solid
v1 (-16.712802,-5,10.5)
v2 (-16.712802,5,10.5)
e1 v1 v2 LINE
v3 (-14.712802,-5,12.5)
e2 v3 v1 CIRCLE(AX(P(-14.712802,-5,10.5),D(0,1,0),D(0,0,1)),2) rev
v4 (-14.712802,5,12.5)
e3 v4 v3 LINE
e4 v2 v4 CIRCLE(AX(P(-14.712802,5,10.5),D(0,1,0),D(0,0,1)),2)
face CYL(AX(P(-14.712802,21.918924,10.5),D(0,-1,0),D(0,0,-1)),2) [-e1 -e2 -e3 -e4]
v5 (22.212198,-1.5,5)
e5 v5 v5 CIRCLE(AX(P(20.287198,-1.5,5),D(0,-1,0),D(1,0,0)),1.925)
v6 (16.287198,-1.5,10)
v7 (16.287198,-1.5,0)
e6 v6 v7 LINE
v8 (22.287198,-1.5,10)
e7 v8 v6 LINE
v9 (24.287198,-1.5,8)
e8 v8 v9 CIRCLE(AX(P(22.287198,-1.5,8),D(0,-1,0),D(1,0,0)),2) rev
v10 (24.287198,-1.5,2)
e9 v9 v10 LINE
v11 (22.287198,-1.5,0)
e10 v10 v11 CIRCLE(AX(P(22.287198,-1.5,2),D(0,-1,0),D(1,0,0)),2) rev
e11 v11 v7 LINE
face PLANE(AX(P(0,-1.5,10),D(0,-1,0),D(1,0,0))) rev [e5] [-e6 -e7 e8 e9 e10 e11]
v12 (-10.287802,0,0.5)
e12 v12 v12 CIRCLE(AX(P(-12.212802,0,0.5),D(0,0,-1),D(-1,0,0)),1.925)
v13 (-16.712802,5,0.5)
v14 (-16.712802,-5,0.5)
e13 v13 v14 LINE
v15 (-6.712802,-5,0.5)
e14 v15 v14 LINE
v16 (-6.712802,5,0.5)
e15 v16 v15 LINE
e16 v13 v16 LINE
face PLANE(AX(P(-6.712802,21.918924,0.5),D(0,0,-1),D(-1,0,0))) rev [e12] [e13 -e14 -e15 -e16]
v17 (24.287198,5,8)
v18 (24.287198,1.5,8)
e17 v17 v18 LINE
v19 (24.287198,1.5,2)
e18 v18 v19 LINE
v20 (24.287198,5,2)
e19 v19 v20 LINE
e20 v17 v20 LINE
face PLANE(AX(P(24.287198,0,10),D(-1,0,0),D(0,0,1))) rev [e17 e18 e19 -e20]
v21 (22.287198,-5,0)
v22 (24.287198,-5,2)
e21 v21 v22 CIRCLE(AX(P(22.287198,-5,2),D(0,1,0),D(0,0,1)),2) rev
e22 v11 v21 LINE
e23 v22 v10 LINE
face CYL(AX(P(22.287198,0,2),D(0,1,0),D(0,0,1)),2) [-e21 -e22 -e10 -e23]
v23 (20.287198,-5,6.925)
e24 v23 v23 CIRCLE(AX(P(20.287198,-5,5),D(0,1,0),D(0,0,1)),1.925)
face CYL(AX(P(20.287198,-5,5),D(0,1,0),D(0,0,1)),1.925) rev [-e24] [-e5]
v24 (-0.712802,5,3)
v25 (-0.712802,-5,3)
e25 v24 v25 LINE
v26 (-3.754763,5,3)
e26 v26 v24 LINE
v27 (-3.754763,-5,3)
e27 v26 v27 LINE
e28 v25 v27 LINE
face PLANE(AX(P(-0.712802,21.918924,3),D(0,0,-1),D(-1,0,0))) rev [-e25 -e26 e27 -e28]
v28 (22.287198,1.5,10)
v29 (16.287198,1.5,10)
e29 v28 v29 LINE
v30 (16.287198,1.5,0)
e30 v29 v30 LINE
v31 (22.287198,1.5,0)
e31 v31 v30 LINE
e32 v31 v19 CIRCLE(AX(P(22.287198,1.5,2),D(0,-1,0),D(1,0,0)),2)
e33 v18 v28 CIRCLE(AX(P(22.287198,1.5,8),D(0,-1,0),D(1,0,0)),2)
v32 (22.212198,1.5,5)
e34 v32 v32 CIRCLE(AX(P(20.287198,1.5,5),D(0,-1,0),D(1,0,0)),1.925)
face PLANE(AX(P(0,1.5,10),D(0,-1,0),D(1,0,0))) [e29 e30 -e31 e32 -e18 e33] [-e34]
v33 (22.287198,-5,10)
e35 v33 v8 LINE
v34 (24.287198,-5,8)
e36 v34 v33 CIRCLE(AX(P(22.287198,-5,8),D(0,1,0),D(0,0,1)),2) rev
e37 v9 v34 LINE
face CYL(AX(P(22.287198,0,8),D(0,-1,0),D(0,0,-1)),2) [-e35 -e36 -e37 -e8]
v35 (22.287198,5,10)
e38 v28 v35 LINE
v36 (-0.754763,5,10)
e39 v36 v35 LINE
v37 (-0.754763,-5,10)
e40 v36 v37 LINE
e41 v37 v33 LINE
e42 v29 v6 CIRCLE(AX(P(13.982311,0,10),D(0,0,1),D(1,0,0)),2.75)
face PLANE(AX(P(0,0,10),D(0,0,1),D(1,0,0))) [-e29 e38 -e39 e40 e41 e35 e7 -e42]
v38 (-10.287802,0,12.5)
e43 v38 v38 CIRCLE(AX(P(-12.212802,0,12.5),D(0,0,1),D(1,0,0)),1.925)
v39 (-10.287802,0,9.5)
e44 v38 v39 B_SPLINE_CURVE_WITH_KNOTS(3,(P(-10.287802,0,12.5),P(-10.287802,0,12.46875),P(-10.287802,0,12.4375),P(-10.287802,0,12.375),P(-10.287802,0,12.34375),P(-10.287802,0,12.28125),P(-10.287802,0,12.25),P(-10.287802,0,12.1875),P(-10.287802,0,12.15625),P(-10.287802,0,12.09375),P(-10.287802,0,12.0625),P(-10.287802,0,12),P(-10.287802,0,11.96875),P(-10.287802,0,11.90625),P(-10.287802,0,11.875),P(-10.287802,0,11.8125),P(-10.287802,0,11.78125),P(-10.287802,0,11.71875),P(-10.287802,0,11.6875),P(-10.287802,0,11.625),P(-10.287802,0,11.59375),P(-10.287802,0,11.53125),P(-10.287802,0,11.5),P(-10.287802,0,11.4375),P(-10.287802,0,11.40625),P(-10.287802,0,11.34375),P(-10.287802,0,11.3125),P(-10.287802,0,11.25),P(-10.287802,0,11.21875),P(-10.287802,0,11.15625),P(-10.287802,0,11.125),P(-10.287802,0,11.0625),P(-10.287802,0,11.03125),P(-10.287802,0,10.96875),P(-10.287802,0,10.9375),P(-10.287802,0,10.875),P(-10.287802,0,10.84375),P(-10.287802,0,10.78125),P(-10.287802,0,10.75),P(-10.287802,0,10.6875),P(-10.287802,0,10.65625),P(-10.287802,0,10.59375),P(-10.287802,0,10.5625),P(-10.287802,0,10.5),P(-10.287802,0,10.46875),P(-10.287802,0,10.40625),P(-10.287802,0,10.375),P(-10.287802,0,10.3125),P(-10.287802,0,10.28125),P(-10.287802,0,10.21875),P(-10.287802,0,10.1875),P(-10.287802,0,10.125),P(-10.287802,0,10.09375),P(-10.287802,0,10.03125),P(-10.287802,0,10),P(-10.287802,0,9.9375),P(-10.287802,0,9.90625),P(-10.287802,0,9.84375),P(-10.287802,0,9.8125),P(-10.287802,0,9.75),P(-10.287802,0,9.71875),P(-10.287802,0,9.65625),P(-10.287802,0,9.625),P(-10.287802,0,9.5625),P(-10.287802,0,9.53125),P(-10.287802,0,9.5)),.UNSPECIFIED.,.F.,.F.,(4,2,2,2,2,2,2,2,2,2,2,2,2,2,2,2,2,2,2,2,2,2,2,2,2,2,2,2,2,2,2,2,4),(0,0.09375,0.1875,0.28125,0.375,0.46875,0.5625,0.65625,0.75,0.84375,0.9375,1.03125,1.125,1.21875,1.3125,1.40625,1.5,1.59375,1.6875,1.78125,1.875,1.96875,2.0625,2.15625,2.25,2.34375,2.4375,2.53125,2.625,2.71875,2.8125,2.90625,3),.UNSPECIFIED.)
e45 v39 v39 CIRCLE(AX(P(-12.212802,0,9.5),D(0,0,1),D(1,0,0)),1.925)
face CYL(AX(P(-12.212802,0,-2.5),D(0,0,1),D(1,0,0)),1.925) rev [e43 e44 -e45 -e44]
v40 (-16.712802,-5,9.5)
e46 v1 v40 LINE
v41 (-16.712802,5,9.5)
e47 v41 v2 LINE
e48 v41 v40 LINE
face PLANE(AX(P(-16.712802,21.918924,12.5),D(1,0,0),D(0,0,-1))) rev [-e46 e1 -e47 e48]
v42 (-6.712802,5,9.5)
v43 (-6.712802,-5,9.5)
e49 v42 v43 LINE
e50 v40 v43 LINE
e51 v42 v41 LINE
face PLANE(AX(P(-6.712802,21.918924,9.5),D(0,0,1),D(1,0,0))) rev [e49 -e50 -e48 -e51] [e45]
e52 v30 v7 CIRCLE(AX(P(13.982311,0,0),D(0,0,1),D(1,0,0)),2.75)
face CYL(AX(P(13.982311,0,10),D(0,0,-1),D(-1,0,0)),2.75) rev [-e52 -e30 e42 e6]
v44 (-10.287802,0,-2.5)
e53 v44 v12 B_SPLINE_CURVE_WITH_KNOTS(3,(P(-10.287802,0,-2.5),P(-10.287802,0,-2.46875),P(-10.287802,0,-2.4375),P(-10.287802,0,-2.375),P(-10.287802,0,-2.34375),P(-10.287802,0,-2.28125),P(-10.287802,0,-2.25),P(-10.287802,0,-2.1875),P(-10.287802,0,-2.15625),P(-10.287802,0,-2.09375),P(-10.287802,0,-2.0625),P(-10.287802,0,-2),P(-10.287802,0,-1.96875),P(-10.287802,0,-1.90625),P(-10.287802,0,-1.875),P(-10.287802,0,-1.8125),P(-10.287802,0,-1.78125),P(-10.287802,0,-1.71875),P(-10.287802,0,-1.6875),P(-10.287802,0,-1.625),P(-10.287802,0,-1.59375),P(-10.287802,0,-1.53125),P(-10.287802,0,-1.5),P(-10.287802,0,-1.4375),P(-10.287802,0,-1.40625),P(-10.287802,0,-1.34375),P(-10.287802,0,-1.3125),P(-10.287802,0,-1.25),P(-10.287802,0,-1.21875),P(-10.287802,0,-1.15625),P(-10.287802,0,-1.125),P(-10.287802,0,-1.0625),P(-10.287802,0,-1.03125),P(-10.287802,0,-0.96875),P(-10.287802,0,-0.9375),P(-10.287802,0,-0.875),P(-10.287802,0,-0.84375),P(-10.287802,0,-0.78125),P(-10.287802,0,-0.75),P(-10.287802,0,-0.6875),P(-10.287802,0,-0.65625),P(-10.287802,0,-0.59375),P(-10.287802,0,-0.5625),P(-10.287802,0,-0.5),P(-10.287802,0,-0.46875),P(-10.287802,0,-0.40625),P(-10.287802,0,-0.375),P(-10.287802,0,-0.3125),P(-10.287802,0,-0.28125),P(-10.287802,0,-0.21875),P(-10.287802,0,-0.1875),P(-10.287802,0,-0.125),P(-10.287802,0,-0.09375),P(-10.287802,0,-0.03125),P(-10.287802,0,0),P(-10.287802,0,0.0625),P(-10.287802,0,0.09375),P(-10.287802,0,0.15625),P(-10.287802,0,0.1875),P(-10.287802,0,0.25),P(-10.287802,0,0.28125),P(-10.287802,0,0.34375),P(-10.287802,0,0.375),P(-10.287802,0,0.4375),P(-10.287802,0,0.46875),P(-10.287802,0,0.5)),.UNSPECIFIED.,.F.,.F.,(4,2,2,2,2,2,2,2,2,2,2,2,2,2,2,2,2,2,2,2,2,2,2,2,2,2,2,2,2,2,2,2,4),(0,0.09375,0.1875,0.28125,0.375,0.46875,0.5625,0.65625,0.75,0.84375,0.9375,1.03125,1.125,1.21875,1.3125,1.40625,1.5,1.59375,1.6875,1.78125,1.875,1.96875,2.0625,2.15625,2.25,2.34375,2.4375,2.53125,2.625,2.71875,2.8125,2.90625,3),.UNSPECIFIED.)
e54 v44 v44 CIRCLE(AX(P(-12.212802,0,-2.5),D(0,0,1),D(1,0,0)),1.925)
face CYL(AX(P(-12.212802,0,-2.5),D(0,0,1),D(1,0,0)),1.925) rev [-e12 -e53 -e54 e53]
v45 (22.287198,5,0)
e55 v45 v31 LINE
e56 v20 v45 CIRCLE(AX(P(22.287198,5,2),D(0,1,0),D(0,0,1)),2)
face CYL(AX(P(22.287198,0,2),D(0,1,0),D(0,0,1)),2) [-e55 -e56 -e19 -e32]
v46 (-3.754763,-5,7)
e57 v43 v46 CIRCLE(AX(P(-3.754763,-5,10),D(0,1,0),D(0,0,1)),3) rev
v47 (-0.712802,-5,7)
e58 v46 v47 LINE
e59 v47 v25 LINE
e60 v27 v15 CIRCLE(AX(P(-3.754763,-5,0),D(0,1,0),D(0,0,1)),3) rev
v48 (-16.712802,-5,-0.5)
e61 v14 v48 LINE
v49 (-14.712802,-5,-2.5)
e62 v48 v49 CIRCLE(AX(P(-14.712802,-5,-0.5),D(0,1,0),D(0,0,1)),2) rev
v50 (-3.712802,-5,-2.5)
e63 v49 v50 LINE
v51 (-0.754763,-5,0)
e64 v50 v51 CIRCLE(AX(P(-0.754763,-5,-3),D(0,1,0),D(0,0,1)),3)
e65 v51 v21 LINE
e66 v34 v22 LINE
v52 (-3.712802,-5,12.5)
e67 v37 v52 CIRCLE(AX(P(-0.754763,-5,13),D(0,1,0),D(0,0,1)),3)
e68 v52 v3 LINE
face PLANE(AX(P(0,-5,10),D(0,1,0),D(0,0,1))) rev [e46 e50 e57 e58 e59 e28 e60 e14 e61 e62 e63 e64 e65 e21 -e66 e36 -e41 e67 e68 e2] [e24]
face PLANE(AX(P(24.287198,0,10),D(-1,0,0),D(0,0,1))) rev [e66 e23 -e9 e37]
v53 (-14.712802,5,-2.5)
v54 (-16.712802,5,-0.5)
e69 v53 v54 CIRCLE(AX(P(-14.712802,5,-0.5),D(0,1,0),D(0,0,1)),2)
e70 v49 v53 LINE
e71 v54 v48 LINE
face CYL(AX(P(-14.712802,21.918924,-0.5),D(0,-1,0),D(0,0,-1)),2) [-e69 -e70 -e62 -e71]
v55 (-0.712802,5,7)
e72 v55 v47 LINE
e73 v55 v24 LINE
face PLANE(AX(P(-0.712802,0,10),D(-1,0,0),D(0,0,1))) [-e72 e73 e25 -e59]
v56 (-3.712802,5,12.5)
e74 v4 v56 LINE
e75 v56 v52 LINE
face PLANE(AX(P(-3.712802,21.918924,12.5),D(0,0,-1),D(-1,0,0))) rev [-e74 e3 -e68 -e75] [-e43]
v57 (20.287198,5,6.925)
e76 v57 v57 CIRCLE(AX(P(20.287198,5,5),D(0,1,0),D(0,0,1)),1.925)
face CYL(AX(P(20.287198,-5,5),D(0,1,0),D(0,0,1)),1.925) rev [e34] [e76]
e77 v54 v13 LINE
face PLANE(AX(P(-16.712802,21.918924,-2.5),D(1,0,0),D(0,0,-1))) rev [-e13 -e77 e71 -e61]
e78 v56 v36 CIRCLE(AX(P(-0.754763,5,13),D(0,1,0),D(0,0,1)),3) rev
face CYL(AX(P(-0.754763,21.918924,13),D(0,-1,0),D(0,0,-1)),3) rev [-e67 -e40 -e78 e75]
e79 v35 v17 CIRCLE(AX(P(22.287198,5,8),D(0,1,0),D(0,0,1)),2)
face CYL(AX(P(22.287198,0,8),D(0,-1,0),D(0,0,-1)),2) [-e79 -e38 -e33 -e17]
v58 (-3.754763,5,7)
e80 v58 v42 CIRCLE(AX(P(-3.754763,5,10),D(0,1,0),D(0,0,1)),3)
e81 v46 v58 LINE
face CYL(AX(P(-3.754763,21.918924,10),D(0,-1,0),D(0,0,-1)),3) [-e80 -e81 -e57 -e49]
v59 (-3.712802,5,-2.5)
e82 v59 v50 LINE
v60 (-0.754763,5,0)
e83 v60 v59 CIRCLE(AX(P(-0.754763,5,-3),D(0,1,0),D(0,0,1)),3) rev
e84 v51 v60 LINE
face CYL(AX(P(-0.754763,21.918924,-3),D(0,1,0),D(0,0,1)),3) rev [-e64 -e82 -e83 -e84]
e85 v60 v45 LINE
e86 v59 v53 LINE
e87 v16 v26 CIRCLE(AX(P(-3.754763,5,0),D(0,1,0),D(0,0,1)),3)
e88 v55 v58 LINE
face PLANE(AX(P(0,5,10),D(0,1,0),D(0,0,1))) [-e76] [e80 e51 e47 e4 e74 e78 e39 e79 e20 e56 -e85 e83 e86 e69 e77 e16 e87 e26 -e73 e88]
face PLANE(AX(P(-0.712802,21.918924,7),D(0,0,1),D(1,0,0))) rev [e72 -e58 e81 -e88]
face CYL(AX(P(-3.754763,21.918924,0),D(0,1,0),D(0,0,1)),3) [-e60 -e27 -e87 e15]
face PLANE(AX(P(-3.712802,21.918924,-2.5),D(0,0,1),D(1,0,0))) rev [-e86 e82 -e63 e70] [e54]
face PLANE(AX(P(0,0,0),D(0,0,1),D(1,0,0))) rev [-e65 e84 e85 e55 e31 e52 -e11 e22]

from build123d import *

# Parameters (mm, degrees)
BOSS_EXTRUDE1_DEPTH             = 10
SKETCH2_R                       = 1.925
CUT_EXTRUDE1_DEPTH              = 29.104589728
BOSS_EXTRUDE2_REACH             = 28.737
BOSS_EXTRUDE2_DIRECTION_2_REACH = 28.737
SKETCH4_R                       = 1.925
CUT_EXTRUDE2_DEPTH              = 29.980475562
FILLET1_START                   = -6
FILLET1_DEPTH                   = 12
FILLET1_START_2                 = -5
FILLET1_2_DEPTH                 = 10
FILLET2_R                       = 2


with BuildPart() as part:
    # Sketch1 → Boss-Extrude1 (new body)
    with BuildSketch(Plane.XY):
        with BuildLine():
            Line((-0.712802471, 5), (-0.712802471, 0))
            Line((-0.712802471, 0), (11.232311414, 0))
            ThreePointArc((11.232311414, 0), (13.199986934, 2.636374102), (16.287197529, 1.5))
            Line((16.287197529, 1.5), (24.287197529, 1.5))
            Line((24.287197529, 1.5), (24.287197529, 5))
            Line((24.287197529, 5), (-0.712802471, 5))
        make_face()
        with BuildLine():
            Line((11.232311414, 0), (-0.712802471, 0))
            Line((-0.712802471, 0), (-0.712802471, -5))
            Line((-0.712802471, -5), (24.287197529, -5))
            Line((24.287197529, -5), (24.287197529, -1.5))
            Line((24.287197529, -1.5), (16.287197529, -1.5))
            ThreePointArc((16.287197529, -1.5), (13.199986934, -2.636374102), (11.232311414, 0))
        make_face()
    extrude(amount=BOSS_EXTRUDE1_DEPTH)

    # Sketch2 → Cut-Extrude1 (cut, through all)
    with BuildSketch(Plane(origin=(0, 5, 0), x_dir=(1, 0, 0), z_dir=(0, 1, 0))):
        with Locations(Location((20.287197529, -5, 0), (0, 0, 270))):
            Circle(SKETCH2_R)
    extrude(amount=-CUT_EXTRUDE1_DEPTH, mode=Mode.SUBTRACT)

    # Boss-Extrude2: up to this face of the body (flat: up to its plane)
    boss_extrude2_end = Plane(part.part.faces().sort_by_distance((11.372052598, 5, 5))[0])
    # Sketch3 → Boss-Extrude2 (add, up to the picked face)
    with BuildSketch(Plane(origin=(0, 0, 0), x_dir=(1, 0, 0), z_dir=(0, 1, 0)), mode=Mode.PRIVATE) as boss_extrude2_sk1:
        Polygon((-0.712802471, 0), (-3.712802471, 0), (-3.712802471, 2.5), (-16.712802471, 2.5), (-16.712802471, -0.5), (-6.712802471, -0.5), (-6.712802471, -3), (-0.712802471, -3), align=None)
    boss_extrude2_tool1 = split(extrude(boss_extrude2_sk1.sketch, amount=BOSS_EXTRUDE2_REACH, mode=Mode.PRIVATE), bisect_by=boss_extrude2_end, keep=Keep.BOTH, mode=Mode.PRIVATE)
    # Sketch3 → Boss-Extrude2 (add, up to the picked face)
    with BuildSketch(Plane(origin=(0, 0, 0), x_dir=(1, 0, 0), z_dir=(0, 1, 0)), mode=Mode.PRIVATE) as boss_extrude2_sk2:
        Polygon((-0.712802471, -7), (-6.712802471, -7), (-6.712802471, -9.5), (-16.712802471, -9.5), (-16.712802471, -12.5), (-3.712802471, -12.5), (-3.712802471, -10), (-0.712802471, -10), align=None)
    boss_extrude2_tool2 = split(extrude(boss_extrude2_sk2.sketch, amount=BOSS_EXTRUDE2_REACH, mode=Mode.PRIVATE), bisect_by=boss_extrude2_end, keep=Keep.BOTH, mode=Mode.PRIVATE)
    add(boss_extrude2_tool1.solids().sort_by(Axis((-8.239829, 0, -0.222973), (0, 1, 0)))[0])
    add(boss_extrude2_tool2.solids().sort_by(Axis((-8.239829, 0, 10.222973), (0, 1, 0)))[0])

    # Boss-Extrude2 direction 2: up to this face of the body (flat: up to its plane)
    boss_extrude2_direction_2_end = Plane(part.part.faces().sort_by_distance((11.372052598, -5, 5))[0])
    # Sketch3 → Boss-Extrude2 direction 2 (add, up to the picked face)
    with BuildSketch(Plane(origin=(0, 0, 0), x_dir=(1, 0, 0), z_dir=(0, 1, 0)), mode=Mode.PRIVATE) as boss_extrude2_direction_2_sk1:
        Polygon((-0.712802471, 0), (-3.712802471, 0), (-3.712802471, 2.5), (-16.712802471, 2.5), (-16.712802471, -0.5), (-6.712802471, -0.5), (-6.712802471, -3), (-0.712802471, -3), align=None)
    boss_extrude2_direction_2_tool1 = split(extrude(boss_extrude2_direction_2_sk1.sketch, amount=-BOSS_EXTRUDE2_DIRECTION_2_REACH, mode=Mode.PRIVATE), bisect_by=boss_extrude2_direction_2_end, keep=Keep.BOTH, mode=Mode.PRIVATE)
    # Sketch3 → Boss-Extrude2 direction 2 (add, up to the picked face)
    with BuildSketch(Plane(origin=(0, 0, 0), x_dir=(1, 0, 0), z_dir=(0, 1, 0)), mode=Mode.PRIVATE) as boss_extrude2_direction_2_sk2:
        Polygon((-0.712802471, -7), (-6.712802471, -7), (-6.712802471, -9.5), (-16.712802471, -9.5), (-16.712802471, -12.5), (-3.712802471, -12.5), (-3.712802471, -10), (-0.712802471, -10), align=None)
    boss_extrude2_direction_2_tool2 = split(extrude(boss_extrude2_direction_2_sk2.sketch, amount=-BOSS_EXTRUDE2_DIRECTION_2_REACH, mode=Mode.PRIVATE), bisect_by=boss_extrude2_direction_2_end, keep=Keep.BOTH, mode=Mode.PRIVATE)
    add(boss_extrude2_direction_2_tool1.solids().sort_by(Axis((-8.239829, 0, -0.222973), (0, -1, 0)))[0])
    add(boss_extrude2_direction_2_tool2.solids().sort_by(Axis((-8.239829, 0, 10.222973), (0, -1, 0)))[0])

    # Sketch4 → Cut-Extrude2 (cut, through all)
    with BuildSketch(Plane.XY.offset(12.5)):
        with Locations((-12.212802471, 0)):
            Circle(SKETCH4_R)
    extrude(amount=-CUT_EXTRUDE2_DEPTH, mode=Mode.SUBTRACT)

    # Fillet1: read off the stored shape, not the designer's step
    # Fillet1 outline → Fillet1 (cut)
    with BuildSketch(Plane(origin=(0, 0, 0), x_dir=(1, 0, 0), z_dir=(0, 1, 0)).offset(FILLET1_START)):
        with BuildLine():
            Line((-6.712802471, -7), (-6.712802471, -9.5))
            ThreePointArc((-6.712802471, -9.5), (-5.691254253, -7.708712153), (-3.75476258, -7))
            Line((-3.75476258, -7), (-6.712802471, -7))
        make_face()
        with BuildLine():
            ThreePointArc((-3.75476258, -3), (-5.691254253, -2.291287847), (-6.712802471, -0.5))
            Line((-6.712802471, -0.5), (-6.712802471, -3))
            Line((-6.712802471, -3), (-3.75476258, -3))
        make_face()
    extrude(amount=FILLET1_DEPTH, mode=Mode.SUBTRACT)

    # Fillet1 2 outline → Fillet1 2 (add)
    with BuildSketch(Plane(origin=(0, 0, 0), x_dir=(1, 0, 0), z_dir=(0, 1, 0)).offset(FILLET1_START_2)):
        with BuildLine():
            Line((-3.712802471, -10), (-3.712802471, -12.5))
            ThreePointArc((-3.712802471, -12.5), (-2.691254253, -10.708712153), (-0.75476258, -10))
            Line((-0.75476258, -10), (-3.712802471, -10))
        make_face()
        with BuildLine():
            ThreePointArc((-0.75476258, 0), (-2.691254253, 0.708712153), (-3.712802471, 2.5))
            Line((-3.712802471, 2.5), (-3.712802471, 0))
            Line((-3.712802471, 0), (-0.75476258, 0))
        make_face()
    extrude(amount=FILLET1_2_DEPTH)

    # Fillet2
    fillet2_edges = [part.edges().sort_by_distance(p)[0] for p in [
        (24.287197529, 3.25, 0),
        (24.287197529, -3.25, 0),
        (24.287197529, -3.25, 10),
        (24.287197529, 3.25, 10),
        (-16.712802471, 0, -2.5),
        (-16.712802471, 0, 12.5),
    ]]
    fillet(fillet2_edges, radius=FILLET2_R)


solid = part.part
